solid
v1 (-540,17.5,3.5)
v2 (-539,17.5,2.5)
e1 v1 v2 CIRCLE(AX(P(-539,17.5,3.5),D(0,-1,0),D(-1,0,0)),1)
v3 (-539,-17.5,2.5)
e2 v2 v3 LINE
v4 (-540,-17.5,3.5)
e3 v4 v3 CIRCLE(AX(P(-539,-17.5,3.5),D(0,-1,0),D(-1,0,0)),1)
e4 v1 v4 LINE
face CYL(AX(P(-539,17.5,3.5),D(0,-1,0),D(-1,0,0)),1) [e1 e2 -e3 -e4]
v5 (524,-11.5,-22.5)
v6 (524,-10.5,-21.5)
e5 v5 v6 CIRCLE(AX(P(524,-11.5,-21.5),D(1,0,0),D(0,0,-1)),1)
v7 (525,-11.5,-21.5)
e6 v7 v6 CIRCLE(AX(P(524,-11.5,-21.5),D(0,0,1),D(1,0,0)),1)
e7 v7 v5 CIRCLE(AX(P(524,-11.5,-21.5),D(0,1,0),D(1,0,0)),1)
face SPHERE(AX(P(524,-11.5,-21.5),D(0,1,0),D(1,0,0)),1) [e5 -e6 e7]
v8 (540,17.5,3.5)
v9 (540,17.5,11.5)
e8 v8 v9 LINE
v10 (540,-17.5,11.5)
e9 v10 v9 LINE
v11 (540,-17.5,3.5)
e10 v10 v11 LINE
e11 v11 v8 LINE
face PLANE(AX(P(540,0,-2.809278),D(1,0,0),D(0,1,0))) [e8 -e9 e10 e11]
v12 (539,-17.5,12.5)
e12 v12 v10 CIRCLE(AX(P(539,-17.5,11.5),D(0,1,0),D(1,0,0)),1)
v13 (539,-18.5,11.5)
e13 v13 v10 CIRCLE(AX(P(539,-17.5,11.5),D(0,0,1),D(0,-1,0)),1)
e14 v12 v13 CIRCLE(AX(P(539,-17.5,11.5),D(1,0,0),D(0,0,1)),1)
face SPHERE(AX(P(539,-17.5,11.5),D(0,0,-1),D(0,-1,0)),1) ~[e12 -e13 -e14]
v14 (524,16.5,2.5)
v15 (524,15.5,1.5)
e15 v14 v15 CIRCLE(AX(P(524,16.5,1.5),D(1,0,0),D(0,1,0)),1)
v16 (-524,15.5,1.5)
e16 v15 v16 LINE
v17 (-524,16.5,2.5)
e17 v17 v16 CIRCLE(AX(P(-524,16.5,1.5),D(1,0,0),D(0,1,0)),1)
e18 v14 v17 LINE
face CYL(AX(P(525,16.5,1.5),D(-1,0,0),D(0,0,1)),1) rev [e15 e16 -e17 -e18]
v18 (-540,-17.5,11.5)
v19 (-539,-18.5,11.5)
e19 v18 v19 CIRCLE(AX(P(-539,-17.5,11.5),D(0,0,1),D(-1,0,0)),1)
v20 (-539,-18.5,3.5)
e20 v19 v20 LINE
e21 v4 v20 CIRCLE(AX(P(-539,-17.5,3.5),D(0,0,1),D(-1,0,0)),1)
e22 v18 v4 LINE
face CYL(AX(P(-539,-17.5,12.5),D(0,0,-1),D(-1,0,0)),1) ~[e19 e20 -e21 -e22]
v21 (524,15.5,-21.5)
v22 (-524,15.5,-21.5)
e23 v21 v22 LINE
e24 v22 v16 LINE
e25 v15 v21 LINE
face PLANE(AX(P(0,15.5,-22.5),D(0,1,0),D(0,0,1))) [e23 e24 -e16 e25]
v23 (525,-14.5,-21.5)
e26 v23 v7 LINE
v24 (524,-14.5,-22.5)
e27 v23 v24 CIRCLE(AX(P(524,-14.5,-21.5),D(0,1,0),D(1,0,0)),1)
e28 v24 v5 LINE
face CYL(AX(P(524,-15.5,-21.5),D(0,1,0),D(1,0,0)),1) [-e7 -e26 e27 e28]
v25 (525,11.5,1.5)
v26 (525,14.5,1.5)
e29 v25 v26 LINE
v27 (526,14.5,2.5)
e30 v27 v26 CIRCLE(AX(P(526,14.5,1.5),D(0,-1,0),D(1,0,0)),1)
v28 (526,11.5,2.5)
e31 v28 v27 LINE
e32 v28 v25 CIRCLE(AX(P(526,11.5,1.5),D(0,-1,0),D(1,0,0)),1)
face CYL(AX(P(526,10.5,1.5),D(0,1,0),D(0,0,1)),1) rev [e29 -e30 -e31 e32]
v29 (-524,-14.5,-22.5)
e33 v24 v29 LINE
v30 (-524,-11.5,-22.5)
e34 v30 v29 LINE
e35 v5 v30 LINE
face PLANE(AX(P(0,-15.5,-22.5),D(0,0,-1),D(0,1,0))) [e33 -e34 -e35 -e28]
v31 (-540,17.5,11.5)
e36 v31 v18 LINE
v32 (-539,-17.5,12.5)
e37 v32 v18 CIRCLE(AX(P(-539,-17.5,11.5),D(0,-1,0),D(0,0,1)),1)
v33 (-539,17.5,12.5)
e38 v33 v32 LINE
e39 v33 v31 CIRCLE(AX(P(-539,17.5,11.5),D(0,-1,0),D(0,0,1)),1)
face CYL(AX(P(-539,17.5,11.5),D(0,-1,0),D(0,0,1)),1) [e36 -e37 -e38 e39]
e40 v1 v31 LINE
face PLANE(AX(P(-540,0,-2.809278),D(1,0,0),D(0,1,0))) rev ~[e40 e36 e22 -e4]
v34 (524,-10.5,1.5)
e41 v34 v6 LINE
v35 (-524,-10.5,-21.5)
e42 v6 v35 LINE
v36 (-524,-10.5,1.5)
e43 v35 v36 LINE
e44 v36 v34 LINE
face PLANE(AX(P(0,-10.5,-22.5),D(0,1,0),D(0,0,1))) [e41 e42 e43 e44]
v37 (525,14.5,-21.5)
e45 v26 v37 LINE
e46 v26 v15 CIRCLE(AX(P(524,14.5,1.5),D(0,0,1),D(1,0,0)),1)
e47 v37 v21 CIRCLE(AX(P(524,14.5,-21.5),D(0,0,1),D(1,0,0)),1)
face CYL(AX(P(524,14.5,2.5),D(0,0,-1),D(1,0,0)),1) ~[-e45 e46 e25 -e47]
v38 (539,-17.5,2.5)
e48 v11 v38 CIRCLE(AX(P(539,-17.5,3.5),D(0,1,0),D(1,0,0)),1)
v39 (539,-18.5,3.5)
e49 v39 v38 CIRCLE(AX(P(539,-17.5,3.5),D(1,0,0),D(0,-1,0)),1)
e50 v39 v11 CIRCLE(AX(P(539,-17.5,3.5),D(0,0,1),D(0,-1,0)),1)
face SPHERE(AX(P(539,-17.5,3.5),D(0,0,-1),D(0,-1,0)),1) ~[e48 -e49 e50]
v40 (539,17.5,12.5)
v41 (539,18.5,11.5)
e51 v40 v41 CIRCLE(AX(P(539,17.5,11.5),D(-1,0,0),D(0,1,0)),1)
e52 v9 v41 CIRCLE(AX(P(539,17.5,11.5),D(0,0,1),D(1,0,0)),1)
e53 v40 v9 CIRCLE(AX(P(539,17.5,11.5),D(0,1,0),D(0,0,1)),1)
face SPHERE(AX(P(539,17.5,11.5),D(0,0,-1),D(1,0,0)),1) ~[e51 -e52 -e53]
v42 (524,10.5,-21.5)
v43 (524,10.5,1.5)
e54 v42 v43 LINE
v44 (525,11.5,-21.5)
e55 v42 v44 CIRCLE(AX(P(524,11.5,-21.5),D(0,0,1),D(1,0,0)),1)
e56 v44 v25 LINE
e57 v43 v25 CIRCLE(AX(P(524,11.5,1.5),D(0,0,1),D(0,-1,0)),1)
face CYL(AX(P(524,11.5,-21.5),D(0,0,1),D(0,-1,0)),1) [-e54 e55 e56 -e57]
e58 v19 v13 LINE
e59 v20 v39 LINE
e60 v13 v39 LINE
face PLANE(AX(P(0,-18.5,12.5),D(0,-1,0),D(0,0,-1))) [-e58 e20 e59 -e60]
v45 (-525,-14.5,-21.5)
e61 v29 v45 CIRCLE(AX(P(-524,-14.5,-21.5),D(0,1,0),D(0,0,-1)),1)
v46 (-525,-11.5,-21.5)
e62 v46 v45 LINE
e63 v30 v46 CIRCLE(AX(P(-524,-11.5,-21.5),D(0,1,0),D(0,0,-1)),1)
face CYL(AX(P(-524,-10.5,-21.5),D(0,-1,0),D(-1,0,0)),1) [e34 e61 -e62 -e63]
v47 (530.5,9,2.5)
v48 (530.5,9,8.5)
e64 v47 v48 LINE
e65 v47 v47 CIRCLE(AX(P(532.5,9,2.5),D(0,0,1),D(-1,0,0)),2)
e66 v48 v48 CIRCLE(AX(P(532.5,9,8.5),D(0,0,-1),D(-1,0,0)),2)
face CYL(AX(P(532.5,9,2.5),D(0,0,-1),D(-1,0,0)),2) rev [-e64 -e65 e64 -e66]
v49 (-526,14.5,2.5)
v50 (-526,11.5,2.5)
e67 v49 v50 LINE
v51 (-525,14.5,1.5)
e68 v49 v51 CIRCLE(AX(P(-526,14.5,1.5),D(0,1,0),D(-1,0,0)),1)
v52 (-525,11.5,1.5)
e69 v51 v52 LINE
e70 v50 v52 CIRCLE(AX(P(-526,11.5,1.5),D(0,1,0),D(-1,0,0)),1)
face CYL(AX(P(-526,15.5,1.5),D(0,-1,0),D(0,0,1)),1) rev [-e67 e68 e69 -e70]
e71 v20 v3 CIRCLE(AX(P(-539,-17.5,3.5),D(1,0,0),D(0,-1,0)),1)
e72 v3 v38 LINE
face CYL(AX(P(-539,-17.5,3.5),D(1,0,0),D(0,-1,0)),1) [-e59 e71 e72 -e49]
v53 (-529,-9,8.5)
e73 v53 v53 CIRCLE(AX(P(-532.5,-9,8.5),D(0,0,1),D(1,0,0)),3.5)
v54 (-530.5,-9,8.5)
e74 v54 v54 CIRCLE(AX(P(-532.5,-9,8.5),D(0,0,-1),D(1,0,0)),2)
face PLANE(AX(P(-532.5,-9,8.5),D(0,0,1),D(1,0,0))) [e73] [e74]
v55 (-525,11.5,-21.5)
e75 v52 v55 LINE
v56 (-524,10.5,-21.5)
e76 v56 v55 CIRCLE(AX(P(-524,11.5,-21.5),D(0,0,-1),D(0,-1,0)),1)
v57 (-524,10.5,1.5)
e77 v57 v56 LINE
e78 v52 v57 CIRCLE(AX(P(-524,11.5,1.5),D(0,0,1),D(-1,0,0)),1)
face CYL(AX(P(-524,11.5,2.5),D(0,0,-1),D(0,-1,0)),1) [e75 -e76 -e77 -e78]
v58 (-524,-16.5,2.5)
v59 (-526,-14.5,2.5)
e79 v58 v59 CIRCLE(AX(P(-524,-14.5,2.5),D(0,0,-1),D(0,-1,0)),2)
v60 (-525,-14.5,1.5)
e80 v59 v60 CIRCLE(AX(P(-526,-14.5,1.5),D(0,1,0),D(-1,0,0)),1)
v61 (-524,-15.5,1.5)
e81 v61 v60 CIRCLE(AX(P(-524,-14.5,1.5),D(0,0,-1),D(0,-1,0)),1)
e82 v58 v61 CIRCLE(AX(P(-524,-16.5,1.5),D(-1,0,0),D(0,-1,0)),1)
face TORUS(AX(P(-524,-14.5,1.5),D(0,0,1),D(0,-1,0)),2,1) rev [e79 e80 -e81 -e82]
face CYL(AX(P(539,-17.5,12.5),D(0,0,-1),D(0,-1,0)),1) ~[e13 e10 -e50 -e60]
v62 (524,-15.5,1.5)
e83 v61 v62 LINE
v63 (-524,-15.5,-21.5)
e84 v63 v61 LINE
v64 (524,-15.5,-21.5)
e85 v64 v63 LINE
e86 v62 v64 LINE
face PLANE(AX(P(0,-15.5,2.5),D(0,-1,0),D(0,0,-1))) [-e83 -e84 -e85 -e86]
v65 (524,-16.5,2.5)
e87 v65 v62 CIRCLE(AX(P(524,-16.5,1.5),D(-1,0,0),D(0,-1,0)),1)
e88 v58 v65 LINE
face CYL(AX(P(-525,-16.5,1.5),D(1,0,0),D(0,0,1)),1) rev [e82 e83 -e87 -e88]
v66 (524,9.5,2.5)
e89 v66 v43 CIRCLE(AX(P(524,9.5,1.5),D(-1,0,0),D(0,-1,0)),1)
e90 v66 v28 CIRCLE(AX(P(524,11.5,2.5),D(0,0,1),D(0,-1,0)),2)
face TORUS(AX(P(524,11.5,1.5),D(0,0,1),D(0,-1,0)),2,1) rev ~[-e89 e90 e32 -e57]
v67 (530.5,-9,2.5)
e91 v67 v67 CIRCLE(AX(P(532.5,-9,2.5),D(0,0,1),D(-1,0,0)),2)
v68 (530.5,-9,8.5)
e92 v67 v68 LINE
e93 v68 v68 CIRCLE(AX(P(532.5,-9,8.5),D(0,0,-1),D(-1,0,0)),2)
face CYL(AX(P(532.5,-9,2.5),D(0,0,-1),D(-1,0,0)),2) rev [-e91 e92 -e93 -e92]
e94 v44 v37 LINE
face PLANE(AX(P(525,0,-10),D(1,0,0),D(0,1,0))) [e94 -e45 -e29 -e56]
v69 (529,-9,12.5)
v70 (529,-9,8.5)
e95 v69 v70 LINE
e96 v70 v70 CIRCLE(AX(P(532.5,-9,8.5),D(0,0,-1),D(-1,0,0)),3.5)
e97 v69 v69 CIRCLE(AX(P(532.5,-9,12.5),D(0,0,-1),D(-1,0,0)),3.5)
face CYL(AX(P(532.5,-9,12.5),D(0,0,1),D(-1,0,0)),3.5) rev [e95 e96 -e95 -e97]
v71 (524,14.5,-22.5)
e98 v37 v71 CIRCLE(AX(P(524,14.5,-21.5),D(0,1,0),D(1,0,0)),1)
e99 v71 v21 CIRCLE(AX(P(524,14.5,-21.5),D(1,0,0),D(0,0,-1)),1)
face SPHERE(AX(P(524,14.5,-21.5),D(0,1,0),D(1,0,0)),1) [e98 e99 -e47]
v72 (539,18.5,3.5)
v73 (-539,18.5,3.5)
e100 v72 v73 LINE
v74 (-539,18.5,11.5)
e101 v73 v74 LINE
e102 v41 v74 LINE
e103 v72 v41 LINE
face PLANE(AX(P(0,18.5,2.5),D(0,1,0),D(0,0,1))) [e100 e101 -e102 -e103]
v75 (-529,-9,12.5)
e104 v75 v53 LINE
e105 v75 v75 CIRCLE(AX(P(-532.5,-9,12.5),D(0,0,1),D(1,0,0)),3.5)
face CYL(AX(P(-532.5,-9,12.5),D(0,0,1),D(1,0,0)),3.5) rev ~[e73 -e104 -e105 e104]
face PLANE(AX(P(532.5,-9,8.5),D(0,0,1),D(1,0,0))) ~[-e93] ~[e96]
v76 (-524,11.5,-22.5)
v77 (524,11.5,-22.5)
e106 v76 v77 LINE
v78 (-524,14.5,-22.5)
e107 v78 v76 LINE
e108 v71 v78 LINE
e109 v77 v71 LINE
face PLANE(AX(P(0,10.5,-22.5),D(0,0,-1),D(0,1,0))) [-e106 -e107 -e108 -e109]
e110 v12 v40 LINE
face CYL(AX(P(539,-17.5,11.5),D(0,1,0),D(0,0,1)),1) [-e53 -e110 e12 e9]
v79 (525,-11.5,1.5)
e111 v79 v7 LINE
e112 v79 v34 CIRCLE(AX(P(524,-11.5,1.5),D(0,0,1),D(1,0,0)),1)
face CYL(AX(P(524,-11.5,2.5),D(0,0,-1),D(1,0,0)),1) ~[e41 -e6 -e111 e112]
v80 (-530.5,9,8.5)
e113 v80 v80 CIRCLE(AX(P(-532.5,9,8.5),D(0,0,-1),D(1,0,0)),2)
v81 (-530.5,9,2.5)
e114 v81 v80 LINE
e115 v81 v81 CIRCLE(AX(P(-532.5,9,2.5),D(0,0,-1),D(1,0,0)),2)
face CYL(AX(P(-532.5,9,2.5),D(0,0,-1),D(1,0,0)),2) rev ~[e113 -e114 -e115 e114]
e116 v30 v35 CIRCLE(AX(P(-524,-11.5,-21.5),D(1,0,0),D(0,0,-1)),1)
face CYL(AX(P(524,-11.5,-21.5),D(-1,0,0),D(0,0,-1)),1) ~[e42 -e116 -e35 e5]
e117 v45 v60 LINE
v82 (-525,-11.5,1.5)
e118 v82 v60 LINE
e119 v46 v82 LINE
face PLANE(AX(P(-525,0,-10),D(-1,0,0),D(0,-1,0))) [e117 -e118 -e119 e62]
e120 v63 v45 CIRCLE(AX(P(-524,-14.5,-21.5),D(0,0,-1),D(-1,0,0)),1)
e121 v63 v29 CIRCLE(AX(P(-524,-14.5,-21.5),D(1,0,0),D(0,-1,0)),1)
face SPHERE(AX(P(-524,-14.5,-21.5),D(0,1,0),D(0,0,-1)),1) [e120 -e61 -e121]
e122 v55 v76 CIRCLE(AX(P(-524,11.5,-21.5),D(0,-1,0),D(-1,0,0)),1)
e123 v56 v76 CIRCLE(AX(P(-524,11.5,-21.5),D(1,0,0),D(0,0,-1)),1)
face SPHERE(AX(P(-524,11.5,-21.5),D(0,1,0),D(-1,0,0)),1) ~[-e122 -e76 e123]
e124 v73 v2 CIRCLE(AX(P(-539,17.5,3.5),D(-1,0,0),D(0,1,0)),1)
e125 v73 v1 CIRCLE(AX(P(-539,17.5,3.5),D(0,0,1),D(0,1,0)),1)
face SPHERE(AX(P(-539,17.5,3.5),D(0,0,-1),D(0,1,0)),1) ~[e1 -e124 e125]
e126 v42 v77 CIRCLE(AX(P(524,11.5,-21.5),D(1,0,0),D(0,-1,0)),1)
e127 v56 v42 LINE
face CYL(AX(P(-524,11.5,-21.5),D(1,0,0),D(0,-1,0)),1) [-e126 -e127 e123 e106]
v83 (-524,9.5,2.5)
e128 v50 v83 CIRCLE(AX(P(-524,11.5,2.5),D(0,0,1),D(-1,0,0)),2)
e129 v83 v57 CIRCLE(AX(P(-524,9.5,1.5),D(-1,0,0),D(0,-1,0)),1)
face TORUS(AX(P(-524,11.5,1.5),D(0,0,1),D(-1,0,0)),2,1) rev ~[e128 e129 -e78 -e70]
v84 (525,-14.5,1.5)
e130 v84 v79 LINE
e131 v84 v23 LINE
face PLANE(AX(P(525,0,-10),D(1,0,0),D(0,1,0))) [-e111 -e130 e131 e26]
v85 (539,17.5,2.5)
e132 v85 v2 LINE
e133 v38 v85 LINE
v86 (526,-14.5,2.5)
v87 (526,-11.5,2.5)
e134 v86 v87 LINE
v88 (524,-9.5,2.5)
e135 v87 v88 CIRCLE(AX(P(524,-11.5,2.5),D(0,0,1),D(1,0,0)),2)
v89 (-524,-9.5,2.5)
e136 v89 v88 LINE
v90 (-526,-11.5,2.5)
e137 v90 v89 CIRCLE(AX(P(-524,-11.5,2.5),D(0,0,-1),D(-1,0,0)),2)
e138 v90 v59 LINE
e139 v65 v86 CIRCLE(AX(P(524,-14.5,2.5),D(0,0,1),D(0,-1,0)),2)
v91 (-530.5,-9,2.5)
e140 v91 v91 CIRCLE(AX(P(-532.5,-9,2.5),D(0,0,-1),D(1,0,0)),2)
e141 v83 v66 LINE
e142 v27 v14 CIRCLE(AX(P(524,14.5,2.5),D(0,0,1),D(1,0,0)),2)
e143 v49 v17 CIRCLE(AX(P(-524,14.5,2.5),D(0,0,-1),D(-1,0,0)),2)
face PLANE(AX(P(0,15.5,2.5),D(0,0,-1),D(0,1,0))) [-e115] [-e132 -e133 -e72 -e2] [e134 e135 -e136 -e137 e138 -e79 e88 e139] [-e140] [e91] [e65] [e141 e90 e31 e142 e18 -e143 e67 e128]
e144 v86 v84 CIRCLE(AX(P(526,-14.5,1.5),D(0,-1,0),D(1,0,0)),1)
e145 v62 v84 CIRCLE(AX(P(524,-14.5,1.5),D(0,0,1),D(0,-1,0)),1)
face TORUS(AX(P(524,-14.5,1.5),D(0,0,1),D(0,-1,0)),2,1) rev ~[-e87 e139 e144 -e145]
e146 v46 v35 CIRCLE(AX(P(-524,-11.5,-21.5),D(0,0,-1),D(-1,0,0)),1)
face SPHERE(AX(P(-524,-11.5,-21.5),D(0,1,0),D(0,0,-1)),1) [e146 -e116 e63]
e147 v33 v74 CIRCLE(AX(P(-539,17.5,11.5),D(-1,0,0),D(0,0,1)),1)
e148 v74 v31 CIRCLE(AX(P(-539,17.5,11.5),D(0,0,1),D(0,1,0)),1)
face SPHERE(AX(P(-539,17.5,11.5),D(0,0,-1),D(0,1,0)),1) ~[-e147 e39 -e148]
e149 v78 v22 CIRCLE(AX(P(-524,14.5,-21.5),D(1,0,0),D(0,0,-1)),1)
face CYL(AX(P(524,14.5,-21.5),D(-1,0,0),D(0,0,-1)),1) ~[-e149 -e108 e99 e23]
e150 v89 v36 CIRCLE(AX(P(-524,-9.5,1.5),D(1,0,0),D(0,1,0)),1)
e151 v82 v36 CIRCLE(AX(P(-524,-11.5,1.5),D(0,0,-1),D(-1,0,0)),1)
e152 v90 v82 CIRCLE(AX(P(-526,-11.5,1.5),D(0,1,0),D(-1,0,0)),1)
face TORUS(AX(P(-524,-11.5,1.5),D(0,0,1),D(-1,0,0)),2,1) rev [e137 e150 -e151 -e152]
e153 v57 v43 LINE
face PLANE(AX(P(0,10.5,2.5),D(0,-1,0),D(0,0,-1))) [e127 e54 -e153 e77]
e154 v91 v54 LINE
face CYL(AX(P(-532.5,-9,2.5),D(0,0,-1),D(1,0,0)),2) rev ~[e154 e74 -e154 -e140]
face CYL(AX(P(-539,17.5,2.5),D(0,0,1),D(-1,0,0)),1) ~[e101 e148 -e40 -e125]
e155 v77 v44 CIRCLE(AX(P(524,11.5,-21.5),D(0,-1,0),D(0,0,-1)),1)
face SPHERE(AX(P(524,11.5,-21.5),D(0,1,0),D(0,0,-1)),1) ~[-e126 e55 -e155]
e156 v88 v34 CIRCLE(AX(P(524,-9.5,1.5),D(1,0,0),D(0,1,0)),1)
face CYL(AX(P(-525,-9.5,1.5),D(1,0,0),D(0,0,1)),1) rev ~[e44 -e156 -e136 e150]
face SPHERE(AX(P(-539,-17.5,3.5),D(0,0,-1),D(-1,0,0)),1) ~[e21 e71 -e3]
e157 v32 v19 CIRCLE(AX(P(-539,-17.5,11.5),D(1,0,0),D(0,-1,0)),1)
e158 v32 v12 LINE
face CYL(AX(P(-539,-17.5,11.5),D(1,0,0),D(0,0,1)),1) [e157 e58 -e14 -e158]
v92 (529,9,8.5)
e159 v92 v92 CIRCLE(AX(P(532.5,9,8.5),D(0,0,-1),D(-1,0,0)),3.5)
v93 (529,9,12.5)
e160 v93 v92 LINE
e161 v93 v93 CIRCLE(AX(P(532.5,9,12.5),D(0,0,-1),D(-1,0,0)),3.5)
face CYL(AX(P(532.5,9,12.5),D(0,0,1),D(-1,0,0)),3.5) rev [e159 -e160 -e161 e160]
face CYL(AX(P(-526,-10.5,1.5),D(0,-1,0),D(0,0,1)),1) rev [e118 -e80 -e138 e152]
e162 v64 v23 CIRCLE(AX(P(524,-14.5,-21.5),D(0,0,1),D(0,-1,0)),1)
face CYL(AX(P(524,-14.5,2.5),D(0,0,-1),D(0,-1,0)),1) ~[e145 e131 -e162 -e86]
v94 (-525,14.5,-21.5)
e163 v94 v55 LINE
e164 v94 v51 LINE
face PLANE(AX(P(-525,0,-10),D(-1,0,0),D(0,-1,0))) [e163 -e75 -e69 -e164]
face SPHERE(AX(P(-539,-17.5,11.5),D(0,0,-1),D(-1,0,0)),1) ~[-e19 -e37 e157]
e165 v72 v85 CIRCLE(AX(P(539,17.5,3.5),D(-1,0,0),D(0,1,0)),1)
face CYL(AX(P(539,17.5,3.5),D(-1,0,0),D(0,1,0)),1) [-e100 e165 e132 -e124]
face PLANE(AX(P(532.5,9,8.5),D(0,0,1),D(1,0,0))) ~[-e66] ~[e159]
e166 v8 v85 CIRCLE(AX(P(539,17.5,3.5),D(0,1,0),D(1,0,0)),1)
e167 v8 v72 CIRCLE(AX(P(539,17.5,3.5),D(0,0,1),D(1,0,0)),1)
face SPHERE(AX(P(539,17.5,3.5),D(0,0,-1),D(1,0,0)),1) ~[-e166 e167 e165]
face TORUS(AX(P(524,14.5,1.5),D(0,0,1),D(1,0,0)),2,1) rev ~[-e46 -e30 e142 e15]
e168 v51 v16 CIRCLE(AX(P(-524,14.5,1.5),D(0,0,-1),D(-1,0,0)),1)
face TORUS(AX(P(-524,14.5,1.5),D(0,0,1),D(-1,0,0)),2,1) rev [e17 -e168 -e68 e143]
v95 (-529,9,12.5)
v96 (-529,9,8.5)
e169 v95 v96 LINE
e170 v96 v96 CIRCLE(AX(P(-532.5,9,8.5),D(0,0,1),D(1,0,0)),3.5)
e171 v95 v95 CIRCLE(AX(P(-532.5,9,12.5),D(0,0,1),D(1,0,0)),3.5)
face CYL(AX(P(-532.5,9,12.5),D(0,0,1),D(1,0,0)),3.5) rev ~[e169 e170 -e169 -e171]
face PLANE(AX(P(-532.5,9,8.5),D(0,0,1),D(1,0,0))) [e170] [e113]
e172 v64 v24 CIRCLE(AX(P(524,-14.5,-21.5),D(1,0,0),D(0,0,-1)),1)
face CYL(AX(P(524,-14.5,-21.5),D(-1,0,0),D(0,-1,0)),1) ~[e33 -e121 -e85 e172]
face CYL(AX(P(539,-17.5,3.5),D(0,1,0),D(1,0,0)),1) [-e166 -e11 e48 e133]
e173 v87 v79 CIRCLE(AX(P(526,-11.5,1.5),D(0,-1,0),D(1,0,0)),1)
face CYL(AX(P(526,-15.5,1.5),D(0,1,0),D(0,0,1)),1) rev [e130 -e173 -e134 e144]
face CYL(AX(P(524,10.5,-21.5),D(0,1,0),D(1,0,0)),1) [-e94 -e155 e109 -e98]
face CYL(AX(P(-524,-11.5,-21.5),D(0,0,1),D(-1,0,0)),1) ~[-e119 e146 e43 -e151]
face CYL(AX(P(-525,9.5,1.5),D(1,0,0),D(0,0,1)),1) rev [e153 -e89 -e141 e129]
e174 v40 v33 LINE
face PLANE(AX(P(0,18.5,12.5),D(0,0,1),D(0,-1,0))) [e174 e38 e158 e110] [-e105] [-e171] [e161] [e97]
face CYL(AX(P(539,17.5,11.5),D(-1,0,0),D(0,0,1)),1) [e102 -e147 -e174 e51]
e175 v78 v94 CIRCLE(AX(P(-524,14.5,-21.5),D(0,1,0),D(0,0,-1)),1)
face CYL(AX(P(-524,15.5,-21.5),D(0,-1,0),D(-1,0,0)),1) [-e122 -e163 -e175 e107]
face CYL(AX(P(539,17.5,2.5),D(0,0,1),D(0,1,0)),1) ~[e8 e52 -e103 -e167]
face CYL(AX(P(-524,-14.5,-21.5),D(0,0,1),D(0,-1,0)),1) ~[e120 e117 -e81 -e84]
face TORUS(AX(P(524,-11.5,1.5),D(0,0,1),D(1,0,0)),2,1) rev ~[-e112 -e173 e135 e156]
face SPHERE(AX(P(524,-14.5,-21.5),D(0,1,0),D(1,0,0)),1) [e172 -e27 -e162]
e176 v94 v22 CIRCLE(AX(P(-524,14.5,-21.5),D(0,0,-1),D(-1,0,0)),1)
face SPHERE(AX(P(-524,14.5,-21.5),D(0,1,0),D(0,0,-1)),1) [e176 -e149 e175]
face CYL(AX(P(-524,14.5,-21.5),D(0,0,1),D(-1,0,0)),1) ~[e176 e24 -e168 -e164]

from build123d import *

# Parameters (mm, degrees)
F1_DEPTH = 540
F2_W     = 31
F2_H     = 25
F3_DEPTH = 15
F4_W     = 31
F4_H     = 25
F5_DEPTH = 15
F6_R     = 2
F7_DEPTH = 10.001
F8_R     = 3.5
F9_DEPTH = 4
F10_R    = 1
F11_R    = 1


# Not quite as in the source:
# - a pattern or mirror of a feature is missing from the dataset's text; its kind, count and spacing are read off the source's solid


with BuildPart() as f1:
    # F0 (on Right) → F1 (new body, symmetric)
    with BuildSketch(Plane.YZ):
        Polygon((18.5, 12.5), (-18.5, 12.5), (-18.5, 2.5), (-15.5, 2.5), (-15.5, -22.5), (-10.5, -22.5), (-10.5, 2.5), (0, 2.5), (10.5, 2.5), (10.5, -22.5), (15.5, -22.5), (15.5, 2.5), (18.5, 2.5), align=None)
    extrude(amount=F1_DEPTH, both=True)

    # F2 (on face) → F3 (cut)
    with BuildSketch(Plane(origin=(-540, 0, 0), x_dir=(0, -1, 0), z_dir=(-1, 0, 0))):
        with Locations((0, -10)):
            Rectangle(F2_W, F2_H)
    extrude(amount=-F3_DEPTH, mode=Mode.SUBTRACT)

    # F4 (on face) → F5 (cut)
    with BuildSketch(Plane.YZ.offset(540)):
        with Locations((0, -10)):
            Rectangle(F4_W, F4_H)
    extrude(amount=-F5_DEPTH, mode=Mode.SUBTRACT)

    # F6 (on face) → F7 (cut, through all)
    with BuildSketch(Plane(origin=(0, 0, 2.5), x_dir=(1, 0, 0), z_dir=(0, 0, -1))):
        with Locations((-532.5, 9)):
            Circle(F6_R)
        with Locations((-532.5, -9)):
            Circle(F6_R)
    f7 = extrude(amount=-F7_DEPTH, mode=Mode.SUBTRACT)

    # F7_copies: F7 across plane
    add(f7.mirror(Plane(origin=(0, 0, 0), x_dir=(0, 0, 1), z_dir=(1, 0, 0))), mode=Mode.SUBTRACT)

    # F8 (on face) → F9 (cut)
    with BuildSketch(Plane.XY.offset(12.5)):
        with Locations((-532.5, -9)):
            Circle(F8_R)
        with Locations((-532.5, 9)):
            Circle(F8_R)
    f9 = extrude(amount=-F9_DEPTH, mode=Mode.SUBTRACT)

    # F9_copies: F9 across plane
    add(f9.mirror(Plane(origin=(0, 0, 0), x_dir=(0, 0, 1), z_dir=(1, 0, 0))), mode=Mode.SUBTRACT)

    # F10
    f10_edges = [f1.edges().sort_by_distance(p)[0] for p in [
        (540, 18.5, 7.5),
        (540, -18.5, 7.5),
        (525, 13, -22.5),
        (525, -13, -22.5),
        (-540, -18.5, 7.5),
        (-525, -13, -22.5),
        (-525, 13, -22.5),
        (-540, 18.5, 7.5),
    ]]
    fillet(f10_edges, radius=F10_R)

    # F11
    f11_edges = [f1.edges().sort_by_distance(p)[0] for p in [
        (-525, -10.5, -9.5),
        (-525, -15.5, -9.5),
        (-525, 15.5, -9.5),
        (-525, 10.5, -9.5),
        (-525, 13, -21.5),
        (-525, 13, 2.5),
        (-540, 0, 2.5),
        (-540, 0, 12.5),
        (0, -15.5, 2.5),
        (-539.707107, 18.207107, 12.5),
        (-539.707107, -18.207107, 12.5),
        (0, 18.5, 12.5),
        (0, -18.5, 12.5),
        (539.707107, 18.207107, 12.5),
        (539.707107, -18.207107, 12.5),
        (540, 0, 12.5),
        (-539.707107, 18.207107, 2.5),
        (-539.707107, -18.207107, 2.5),
        (0, 18.5, 2.5),
        (0, -18.5, 2.5),
        (539.707107, 18.207107, 2.5),
        (539.707107, -18.207107, 2.5),
        (540, 0, 2.5),
        (-525, -13, 2.5),
        (525, -13, 2.5),
        (0, -10.5, 2.5),
        (0, 10.5, 2.5),
        (525, 13, 2.5),
        (0, 15.5, 2.5),
        (525, -15.5, -9.5),
        (524.707107, -15.5, -22.207107),
        (0, -15.5, -22.5),
        (-524.707107, -15.5, -22.207107),
        (525, -10.5, -9.5),
        (0, -10.5, -22.5),
        (-524.707107, -10.5, -22.207107),
        (524.707107, -10.5, -22.207107),
        (525, 10.5, -9.5),
        (524.707107, 10.5, -22.207107),
        (0, 10.5, -22.5),
        (-524.707107, 10.5, -22.207107),
        (525, 15.5, -9.5),
        (0, 15.5, -22.5),
        (-524.707107, 15.5, -22.207107),
        (524.707107, 15.5, -22.207107),
    ]]
    fillet(f11_edges, radius=F11_R)


solid = f1.part
